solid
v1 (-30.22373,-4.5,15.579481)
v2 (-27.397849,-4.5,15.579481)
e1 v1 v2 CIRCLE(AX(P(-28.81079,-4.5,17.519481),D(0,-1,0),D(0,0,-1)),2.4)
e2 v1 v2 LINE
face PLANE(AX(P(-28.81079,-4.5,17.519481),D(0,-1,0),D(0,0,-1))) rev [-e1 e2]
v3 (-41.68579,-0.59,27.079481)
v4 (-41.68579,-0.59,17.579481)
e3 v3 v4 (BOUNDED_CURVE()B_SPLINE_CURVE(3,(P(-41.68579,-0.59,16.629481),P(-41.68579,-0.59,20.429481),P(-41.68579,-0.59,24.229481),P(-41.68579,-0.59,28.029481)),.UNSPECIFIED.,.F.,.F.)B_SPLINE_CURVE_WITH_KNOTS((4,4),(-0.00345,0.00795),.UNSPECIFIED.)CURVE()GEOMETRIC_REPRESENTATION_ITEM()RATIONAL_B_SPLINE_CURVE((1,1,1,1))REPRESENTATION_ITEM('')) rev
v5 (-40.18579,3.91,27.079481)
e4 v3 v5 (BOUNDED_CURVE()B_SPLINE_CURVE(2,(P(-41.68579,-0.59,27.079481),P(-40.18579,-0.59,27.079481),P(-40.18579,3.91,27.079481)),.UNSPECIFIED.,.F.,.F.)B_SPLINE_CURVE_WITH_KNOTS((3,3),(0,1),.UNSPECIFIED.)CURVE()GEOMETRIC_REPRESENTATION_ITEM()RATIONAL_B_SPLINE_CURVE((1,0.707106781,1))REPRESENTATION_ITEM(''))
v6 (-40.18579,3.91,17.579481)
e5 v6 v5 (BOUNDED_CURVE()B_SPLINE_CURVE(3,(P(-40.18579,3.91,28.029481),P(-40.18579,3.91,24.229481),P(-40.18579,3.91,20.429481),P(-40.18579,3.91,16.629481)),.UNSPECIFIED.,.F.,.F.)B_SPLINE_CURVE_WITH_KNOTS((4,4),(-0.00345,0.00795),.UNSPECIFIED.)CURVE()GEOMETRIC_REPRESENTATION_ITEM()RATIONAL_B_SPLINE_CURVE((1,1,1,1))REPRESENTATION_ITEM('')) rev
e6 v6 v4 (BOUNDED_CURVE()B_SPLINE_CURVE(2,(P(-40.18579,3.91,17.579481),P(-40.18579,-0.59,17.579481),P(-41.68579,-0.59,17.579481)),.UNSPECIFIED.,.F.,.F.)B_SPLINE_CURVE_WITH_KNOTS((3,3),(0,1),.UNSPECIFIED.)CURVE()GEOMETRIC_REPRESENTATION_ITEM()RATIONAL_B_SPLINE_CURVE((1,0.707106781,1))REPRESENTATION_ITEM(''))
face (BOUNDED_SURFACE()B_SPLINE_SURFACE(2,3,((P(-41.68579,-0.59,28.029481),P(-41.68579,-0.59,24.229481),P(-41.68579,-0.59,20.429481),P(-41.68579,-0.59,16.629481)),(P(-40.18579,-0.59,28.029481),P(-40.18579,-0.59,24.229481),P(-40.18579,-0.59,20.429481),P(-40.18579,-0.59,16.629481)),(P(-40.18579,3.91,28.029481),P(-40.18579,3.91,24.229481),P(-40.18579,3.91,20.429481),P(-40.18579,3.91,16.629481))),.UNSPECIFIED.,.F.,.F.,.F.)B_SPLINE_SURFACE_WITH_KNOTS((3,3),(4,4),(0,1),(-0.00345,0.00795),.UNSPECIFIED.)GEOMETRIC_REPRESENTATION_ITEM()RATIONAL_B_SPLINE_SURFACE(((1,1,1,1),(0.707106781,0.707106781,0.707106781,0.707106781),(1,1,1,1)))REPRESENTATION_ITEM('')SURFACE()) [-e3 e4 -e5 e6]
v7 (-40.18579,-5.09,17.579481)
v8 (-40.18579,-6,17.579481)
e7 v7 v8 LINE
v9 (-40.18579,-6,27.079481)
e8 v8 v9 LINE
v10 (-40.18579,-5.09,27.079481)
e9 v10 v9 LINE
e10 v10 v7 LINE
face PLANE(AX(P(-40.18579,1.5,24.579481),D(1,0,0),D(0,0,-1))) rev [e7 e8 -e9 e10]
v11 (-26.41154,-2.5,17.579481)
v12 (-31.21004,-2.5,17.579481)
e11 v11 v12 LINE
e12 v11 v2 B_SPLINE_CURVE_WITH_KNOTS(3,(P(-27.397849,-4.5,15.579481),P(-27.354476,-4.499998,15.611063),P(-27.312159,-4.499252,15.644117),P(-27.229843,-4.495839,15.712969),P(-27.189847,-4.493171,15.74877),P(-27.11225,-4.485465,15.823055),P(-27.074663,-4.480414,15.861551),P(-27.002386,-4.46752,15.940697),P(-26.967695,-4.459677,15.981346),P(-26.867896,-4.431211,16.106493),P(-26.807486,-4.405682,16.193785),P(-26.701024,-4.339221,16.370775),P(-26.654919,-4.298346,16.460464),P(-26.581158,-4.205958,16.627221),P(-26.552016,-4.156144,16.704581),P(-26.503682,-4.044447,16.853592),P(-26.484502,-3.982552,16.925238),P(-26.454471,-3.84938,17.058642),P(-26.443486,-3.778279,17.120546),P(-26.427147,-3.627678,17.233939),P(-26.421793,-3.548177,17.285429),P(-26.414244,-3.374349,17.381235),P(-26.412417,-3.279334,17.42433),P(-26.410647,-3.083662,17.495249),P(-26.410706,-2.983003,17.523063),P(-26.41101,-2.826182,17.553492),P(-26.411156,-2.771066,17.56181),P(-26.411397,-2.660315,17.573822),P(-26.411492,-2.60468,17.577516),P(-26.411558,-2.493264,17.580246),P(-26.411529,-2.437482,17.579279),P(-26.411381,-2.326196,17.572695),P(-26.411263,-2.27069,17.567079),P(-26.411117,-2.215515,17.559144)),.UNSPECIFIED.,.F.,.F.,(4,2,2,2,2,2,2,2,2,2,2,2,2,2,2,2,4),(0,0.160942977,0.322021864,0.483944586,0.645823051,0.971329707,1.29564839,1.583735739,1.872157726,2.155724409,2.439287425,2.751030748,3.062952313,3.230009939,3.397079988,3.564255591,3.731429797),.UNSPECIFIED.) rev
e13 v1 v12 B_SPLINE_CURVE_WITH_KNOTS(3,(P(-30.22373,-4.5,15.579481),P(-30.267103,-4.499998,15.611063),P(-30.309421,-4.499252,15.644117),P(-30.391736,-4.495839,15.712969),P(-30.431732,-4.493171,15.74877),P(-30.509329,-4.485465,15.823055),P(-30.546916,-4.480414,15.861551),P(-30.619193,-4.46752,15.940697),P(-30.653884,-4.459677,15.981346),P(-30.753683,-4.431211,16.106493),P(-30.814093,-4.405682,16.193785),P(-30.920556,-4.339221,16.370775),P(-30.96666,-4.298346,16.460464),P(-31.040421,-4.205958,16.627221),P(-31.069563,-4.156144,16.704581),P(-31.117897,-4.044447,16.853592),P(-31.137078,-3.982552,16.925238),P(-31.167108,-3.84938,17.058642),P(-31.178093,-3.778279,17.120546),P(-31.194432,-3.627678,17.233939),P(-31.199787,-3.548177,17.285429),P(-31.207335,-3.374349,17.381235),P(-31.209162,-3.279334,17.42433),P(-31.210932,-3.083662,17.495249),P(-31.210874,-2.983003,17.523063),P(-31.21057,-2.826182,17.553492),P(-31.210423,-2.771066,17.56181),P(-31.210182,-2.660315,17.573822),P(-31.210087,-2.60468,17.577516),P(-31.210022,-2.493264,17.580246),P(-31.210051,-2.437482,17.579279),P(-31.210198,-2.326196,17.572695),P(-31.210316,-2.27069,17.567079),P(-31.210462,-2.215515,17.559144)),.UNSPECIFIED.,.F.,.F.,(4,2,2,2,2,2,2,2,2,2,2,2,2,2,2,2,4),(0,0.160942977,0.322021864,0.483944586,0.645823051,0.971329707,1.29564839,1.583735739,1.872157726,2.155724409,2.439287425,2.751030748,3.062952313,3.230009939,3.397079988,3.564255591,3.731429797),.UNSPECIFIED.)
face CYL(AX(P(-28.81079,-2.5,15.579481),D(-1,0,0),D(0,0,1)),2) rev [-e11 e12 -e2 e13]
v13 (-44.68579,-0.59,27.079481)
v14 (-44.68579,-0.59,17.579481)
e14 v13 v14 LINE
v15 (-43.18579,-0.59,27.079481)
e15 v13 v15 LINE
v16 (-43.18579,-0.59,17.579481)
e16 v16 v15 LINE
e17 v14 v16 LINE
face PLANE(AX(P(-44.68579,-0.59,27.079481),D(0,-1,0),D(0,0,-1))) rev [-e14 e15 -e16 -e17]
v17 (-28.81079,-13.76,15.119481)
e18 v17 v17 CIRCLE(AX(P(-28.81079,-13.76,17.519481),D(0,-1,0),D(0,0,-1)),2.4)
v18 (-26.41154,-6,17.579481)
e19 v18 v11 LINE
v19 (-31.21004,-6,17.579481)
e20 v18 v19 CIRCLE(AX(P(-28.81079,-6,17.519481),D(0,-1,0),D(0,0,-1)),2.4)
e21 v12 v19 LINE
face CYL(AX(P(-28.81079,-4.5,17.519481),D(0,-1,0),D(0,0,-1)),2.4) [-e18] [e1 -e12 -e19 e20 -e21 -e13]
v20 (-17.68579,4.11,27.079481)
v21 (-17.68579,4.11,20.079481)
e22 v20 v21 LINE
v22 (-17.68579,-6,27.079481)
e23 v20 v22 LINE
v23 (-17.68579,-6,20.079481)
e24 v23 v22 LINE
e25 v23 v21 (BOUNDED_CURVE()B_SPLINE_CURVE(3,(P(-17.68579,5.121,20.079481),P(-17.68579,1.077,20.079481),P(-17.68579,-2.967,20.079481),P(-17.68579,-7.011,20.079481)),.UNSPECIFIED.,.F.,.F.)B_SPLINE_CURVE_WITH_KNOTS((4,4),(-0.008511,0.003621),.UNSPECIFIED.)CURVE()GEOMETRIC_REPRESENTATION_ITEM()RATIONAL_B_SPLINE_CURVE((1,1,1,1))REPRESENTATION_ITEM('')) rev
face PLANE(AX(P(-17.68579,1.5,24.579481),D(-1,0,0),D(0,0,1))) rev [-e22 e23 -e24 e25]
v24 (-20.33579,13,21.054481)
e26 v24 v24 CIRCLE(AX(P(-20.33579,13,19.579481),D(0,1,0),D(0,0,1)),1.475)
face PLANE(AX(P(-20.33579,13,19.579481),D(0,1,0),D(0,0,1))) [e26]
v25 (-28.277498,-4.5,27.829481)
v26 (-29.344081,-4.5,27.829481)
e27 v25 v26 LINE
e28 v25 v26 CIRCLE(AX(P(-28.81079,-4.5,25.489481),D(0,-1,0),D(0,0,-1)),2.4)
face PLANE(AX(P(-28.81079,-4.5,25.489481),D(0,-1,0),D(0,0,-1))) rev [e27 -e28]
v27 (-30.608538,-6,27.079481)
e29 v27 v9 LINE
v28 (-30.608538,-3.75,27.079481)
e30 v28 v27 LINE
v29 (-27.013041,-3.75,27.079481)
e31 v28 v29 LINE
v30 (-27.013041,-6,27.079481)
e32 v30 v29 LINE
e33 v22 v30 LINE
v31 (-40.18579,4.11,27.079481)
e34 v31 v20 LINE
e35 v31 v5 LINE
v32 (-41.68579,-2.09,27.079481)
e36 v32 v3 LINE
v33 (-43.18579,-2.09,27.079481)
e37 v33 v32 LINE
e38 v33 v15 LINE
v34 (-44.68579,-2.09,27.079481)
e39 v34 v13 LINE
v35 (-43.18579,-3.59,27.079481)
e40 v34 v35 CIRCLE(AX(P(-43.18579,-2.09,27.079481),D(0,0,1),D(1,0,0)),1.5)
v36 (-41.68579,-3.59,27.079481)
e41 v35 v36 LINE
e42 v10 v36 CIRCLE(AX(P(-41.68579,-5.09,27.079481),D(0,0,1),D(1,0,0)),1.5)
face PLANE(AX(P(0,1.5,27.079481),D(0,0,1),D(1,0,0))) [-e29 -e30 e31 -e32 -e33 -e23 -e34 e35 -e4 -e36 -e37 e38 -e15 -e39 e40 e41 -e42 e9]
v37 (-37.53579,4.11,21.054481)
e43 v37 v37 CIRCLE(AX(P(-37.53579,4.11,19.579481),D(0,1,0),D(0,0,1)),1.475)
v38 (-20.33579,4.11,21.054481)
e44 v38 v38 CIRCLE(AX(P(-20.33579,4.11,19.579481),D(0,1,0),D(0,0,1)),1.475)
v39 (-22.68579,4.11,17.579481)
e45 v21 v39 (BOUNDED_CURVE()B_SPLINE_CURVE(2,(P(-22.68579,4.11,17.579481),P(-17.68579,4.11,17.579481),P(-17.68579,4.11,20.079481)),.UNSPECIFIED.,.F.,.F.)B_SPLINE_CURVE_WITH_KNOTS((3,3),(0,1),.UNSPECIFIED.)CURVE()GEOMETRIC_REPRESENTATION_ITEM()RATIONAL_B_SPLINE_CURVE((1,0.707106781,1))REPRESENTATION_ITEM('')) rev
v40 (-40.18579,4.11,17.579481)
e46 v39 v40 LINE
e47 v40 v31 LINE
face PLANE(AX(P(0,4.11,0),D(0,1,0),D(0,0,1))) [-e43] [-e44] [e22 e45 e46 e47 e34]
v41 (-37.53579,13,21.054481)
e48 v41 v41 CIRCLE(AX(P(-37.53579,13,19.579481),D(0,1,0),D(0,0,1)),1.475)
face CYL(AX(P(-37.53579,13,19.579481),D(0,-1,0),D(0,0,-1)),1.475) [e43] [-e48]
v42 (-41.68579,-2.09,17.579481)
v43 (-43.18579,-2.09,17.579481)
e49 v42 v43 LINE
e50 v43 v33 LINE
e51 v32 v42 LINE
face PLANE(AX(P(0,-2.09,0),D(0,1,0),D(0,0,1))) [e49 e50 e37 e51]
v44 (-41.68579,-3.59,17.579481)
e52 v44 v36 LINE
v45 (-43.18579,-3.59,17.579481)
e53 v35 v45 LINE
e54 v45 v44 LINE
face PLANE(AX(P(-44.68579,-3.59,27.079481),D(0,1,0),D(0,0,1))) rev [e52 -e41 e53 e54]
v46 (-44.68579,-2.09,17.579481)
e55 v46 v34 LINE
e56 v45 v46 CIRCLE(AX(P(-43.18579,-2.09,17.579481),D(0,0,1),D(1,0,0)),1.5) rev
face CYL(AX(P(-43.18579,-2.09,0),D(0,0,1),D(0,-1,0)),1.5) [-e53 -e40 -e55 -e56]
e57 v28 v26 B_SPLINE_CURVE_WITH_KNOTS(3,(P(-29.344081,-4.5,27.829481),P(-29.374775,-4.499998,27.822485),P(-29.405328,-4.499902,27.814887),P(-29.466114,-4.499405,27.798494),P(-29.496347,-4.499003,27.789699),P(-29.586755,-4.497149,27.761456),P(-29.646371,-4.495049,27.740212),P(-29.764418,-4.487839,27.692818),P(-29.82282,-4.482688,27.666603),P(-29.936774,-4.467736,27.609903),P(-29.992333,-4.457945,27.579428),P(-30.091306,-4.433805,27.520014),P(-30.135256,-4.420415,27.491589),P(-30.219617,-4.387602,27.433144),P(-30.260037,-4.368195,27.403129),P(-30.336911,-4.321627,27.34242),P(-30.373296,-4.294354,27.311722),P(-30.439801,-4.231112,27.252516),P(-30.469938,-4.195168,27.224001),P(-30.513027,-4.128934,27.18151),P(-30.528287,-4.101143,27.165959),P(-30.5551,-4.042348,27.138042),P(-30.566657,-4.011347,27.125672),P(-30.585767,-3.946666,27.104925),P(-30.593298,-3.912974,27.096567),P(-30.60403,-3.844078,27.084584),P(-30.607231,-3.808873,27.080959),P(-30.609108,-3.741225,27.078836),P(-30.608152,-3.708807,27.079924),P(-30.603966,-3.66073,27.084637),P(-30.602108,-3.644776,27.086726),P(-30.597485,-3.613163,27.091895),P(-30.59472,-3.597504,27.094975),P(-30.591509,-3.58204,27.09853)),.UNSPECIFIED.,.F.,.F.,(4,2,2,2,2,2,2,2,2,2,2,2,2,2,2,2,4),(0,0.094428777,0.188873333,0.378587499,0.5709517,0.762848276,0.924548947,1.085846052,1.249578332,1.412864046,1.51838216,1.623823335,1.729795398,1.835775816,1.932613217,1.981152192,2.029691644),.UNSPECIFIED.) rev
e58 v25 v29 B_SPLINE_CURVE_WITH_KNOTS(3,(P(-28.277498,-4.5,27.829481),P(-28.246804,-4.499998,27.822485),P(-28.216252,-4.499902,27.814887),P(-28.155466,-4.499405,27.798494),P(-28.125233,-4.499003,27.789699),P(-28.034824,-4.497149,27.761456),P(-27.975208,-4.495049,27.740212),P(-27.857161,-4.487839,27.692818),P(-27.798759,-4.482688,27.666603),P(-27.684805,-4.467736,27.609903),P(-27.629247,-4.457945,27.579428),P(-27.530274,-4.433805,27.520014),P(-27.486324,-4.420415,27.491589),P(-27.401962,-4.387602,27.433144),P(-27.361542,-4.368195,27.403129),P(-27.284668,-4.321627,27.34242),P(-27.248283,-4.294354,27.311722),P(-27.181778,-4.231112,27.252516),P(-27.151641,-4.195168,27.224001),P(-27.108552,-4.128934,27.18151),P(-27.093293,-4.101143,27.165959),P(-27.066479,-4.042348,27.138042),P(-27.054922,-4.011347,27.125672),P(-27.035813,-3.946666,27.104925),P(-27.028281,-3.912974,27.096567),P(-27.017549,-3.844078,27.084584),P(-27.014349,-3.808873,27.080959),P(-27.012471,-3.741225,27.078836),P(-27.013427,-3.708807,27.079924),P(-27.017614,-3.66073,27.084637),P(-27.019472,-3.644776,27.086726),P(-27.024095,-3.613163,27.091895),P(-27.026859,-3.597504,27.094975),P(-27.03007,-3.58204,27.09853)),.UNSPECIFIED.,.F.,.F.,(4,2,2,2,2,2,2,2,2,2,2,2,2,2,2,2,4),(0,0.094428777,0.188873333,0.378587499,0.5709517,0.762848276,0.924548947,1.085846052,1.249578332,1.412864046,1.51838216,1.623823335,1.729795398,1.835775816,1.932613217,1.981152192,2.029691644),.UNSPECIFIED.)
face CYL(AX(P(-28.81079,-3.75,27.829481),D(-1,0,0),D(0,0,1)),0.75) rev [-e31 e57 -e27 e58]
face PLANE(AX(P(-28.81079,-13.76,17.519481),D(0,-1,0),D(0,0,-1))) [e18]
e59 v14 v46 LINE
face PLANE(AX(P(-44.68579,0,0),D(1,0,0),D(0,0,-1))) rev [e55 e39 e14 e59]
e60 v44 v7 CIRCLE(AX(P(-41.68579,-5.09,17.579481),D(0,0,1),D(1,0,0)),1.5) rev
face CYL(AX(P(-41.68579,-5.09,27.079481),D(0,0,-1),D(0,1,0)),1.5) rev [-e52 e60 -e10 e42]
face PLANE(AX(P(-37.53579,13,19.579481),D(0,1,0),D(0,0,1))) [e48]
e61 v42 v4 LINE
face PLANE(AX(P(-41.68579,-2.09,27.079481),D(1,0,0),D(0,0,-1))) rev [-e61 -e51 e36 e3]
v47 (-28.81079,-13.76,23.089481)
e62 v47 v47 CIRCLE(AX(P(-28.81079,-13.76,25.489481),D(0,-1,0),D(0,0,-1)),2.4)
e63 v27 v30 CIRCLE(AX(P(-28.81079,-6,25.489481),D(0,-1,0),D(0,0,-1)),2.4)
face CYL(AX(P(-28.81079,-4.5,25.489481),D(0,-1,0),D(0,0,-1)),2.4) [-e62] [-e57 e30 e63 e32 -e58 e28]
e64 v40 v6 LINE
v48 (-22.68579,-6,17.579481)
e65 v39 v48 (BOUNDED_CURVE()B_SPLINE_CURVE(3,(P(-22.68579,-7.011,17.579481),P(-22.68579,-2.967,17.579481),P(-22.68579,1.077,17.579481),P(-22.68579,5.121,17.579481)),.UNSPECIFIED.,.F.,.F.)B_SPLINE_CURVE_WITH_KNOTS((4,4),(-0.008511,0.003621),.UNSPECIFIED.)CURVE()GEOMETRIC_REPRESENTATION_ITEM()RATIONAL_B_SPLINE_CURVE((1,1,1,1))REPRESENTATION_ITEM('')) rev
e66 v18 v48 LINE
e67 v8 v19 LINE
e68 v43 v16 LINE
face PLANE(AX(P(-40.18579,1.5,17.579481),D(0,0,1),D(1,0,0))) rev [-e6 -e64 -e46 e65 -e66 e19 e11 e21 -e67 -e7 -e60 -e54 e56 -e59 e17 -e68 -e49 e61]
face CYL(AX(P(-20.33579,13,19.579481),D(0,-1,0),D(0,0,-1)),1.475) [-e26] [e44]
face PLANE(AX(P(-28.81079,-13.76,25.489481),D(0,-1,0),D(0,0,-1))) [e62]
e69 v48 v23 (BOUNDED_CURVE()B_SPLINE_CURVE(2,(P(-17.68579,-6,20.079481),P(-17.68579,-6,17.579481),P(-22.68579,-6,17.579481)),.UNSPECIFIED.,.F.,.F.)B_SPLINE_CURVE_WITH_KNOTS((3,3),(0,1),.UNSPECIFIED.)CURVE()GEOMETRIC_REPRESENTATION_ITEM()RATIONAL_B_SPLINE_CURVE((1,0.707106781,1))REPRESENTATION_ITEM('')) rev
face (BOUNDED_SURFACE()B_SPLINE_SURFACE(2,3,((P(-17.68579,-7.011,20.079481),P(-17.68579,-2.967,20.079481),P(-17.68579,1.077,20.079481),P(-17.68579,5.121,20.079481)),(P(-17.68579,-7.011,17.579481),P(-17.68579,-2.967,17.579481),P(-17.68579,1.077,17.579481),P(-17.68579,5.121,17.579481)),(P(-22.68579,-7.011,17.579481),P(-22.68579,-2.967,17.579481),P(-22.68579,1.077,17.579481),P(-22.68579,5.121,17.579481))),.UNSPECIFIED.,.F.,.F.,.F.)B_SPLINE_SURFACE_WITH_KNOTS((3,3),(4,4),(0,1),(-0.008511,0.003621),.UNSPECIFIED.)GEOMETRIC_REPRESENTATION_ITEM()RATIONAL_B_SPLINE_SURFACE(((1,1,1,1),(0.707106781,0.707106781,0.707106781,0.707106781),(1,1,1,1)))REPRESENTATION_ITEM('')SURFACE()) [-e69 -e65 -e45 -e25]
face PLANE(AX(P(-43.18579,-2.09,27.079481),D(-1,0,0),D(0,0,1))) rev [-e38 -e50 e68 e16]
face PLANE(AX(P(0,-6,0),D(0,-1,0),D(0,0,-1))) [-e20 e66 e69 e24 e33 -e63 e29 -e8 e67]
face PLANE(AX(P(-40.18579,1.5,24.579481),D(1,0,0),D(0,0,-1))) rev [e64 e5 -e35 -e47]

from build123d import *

# Parameters (mm, degrees)
SKETCH1_W                = 22.5
SKETCH1_H                = 7
BOSS_EXTRUDE1_DEPTH      = 1.5
SKETCH2_R                = 1.475
BOSS_EXTRUDE2_DEPTH      = 11.5
BOSS_EXTRUDE4_DEPTH      = 6
BOSS_EXTRUDE4_DEPTH_BACK = 1.5
SKETCH4_W                = 22.5
SKETCH4_H                = 2.5
SKETCH4_H_2              = 7
SKETCH8_W                = 22.5
SKETCH8_H                = 9.5
BOSS_EXTRUDE7_DEPTH      = 2.61
BOSS_EXTRUDE8_DEPTH      = 7.76
BOSS_EXTRUDE8_DEPTH_BACK = 1.5
SKETCH9_R                = 2.4
SKETCH15_W               = 9.5
SKETCH15_H               = 3
BOSS_EXTRUDE11_DEPTH     = 4.5
SKETCH16_W               = 1.5
SKETCH16_H               = 9.5
CUT_EXTRUDE3_DEPTH       = 1.5
FILLET1_SIZE             = 4.5
FILLET1_SIZE_2           = 1.5
FILLET2_R                = 1.5
FILLET3_R                = 1.5
FILLET4_R                = 2
FILLET5_R                = 0.75
FILLET9_SIZE             = 5
FILLET9_SIZE_2           = 2.5


with BuildPart() as part:
    # Sketch1 → Boss-Extrude1 (new body)
    with BuildSketch(Plane(origin=(0, 0, 0), x_dir=(1, 0, 0), z_dir=(0, 1, 0))):
        with Locations((-28.93578967, -21.079480712)):
            Rectangle(SKETCH1_W, SKETCH1_H)
    extrude(amount=BOSS_EXTRUDE1_DEPTH)

    # Sketch2 → Boss-Extrude2 (add)
    with BuildSketch(Plane(origin=(0, 1.5, 0), x_dir=(1, 0, 0), z_dir=(0, 1, 0))):
        with Locations(Location((-37.53578967, -19.579480712, 0), (0, 0, 90))):
            Circle(SKETCH2_R)
        with Locations(Location((-20.33578967, -19.579480712, 0), (0, 0, 90))):
            Circle(SKETCH2_R)
    extrude(amount=BOSS_EXTRUDE2_DEPTH)

    # Sketch4 → Boss-Extrude4 (add, two sides: drawn at the far end of the back side and taken through both)
    with BuildSketch(Plane(origin=(0, 0, 0), x_dir=(-1, 0, 0), z_dir=(0, -1, 0)).offset(-BOSS_EXTRUDE4_DEPTH_BACK)):
        with Locations((28.93578967, -25.829480712)):
            Rectangle(SKETCH4_W, SKETCH4_H)
        with Locations((28.93578967, -21.079480712)):
            Rectangle(SKETCH4_W, SKETCH4_H_2)
    extrude(amount=BOSS_EXTRUDE4_DEPTH + BOSS_EXTRUDE4_DEPTH_BACK)

    # Sketch8 → Boss-Extrude7 (add)
    with BuildSketch(Plane(origin=(0, 1.5, 0), x_dir=(1, 0, 0), z_dir=(0, 1, 0))):
        with Locations((-28.93578967, -22.329480712)):
            Rectangle(SKETCH8_W, SKETCH8_H)
    extrude(amount=BOSS_EXTRUDE7_DEPTH)

    # Sketch9 → Boss-Extrude8 (add, two sides: drawn at the far end of the back side and taken through both)
    with BuildSketch(Plane(origin=(0, -6, 0), x_dir=(-1, 0, 0), z_dir=(0, -1, 0)).offset(-BOSS_EXTRUDE8_DEPTH_BACK)):
        with Locations(Location((28.81078967, -25.489480712, 0), (0, 0, 90))):
            Circle(SKETCH9_R)
        with Locations(Location((28.81078967, -17.519480712, 0), (0, 0, 90))):
            Circle(SKETCH9_R)
    extrude(amount=BOSS_EXTRUDE8_DEPTH + BOSS_EXTRUDE8_DEPTH_BACK)

    # Sketch15 → Boss-Extrude11 (add)
    with BuildSketch(Plane.ZY.offset(40.18578967)):
        with Locations((22.329480712, -2.09)):
            Rectangle(SKETCH15_W, SKETCH15_H)
    extrude(amount=BOSS_EXTRUDE11_DEPTH)

    # Sketch16 → Cut-Extrude3 (cut)
    with BuildSketch(Plane(origin=(0, -0.59, 0), x_dir=(1, 0, 0), z_dir=(0, 1, 0))):
        with Locations((-42.43578967, -22.329480712)):
            Rectangle(SKETCH16_W, SKETCH16_H)
    extrude(amount=-CUT_EXTRUDE3_DEPTH, mode=Mode.SUBTRACT)

    # Fillet1
    # an asymmetric fillet: 4.5, 1.5 mm, written as the material it adds along each edge
    with BuildSketch(Plane(origin=(-40.18578967, -0.59, 27.079480712), x_dir=(0, 1, 0), z_dir=(0, 0, -1))) as fillet1_piece_1:
        with BuildLine():
            Bezier((FILLET1_SIZE, 0), (0, 0), (0, -FILLET1_SIZE_2), weights=[1, 0.707106781, 1])
            Line((0, -FILLET1_SIZE_2), (0, 0))
            Line((0, 0), (FILLET1_SIZE, 0))
        make_face()
    extrude(amount=9.5)

    # Fillet2
    fillet2_edges = [part.edges().sort_by_distance(p)[0] for p in [
        (-44.68578967, -3.59, 22.329480712),
    ]]
    fillet(fillet2_edges, radius=FILLET2_R)

    # Fillet3
    fillet3_edges = [part.edges().sort_by_distance(p)[0] for p in [
        (-40.18578967, -3.59, 22.329480712),
    ]]
    fillet(fillet3_edges, radius=FILLET3_R)

    # Fillet4
    fillet4_edges = [part.edges().sort_by_distance(p)[0] for p in [
        (-28.81078967, -4.5, 17.579480712),
    ]]
    fillet(fillet4_edges, radius=FILLET4_R)

    # Fillet5
    fillet5_edges = [part.edges().sort_by_distance(p)[0] for p in [
        (-28.81078967, -4.5, 27.079480712),
    ]]
    fillet(fillet5_edges, radius=FILLET5_R)

    # Fillet9
    # an asymmetric fillet: 5, 2.5 mm, written as the material it takes off along each edge
    with BuildSketch(Plane(origin=(-17.68578967, 16.61, 17.579480712), x_dir=(-1, 0, 0), z_dir=(0, -1, 0))) as fillet9_piece_1:
        with BuildLine():
            Bezier((FILLET9_SIZE, 0), (0, 0), (0, -FILLET9_SIZE_2), weights=[1, 0.707106781, 1])
            Line((0, -FILLET9_SIZE_2), (0, 0))
            Line((0, 0), (FILLET9_SIZE, 0))
        make_face()
    extrude(amount=35.11, mode=Mode.SUBTRACT)


solid = part.part
